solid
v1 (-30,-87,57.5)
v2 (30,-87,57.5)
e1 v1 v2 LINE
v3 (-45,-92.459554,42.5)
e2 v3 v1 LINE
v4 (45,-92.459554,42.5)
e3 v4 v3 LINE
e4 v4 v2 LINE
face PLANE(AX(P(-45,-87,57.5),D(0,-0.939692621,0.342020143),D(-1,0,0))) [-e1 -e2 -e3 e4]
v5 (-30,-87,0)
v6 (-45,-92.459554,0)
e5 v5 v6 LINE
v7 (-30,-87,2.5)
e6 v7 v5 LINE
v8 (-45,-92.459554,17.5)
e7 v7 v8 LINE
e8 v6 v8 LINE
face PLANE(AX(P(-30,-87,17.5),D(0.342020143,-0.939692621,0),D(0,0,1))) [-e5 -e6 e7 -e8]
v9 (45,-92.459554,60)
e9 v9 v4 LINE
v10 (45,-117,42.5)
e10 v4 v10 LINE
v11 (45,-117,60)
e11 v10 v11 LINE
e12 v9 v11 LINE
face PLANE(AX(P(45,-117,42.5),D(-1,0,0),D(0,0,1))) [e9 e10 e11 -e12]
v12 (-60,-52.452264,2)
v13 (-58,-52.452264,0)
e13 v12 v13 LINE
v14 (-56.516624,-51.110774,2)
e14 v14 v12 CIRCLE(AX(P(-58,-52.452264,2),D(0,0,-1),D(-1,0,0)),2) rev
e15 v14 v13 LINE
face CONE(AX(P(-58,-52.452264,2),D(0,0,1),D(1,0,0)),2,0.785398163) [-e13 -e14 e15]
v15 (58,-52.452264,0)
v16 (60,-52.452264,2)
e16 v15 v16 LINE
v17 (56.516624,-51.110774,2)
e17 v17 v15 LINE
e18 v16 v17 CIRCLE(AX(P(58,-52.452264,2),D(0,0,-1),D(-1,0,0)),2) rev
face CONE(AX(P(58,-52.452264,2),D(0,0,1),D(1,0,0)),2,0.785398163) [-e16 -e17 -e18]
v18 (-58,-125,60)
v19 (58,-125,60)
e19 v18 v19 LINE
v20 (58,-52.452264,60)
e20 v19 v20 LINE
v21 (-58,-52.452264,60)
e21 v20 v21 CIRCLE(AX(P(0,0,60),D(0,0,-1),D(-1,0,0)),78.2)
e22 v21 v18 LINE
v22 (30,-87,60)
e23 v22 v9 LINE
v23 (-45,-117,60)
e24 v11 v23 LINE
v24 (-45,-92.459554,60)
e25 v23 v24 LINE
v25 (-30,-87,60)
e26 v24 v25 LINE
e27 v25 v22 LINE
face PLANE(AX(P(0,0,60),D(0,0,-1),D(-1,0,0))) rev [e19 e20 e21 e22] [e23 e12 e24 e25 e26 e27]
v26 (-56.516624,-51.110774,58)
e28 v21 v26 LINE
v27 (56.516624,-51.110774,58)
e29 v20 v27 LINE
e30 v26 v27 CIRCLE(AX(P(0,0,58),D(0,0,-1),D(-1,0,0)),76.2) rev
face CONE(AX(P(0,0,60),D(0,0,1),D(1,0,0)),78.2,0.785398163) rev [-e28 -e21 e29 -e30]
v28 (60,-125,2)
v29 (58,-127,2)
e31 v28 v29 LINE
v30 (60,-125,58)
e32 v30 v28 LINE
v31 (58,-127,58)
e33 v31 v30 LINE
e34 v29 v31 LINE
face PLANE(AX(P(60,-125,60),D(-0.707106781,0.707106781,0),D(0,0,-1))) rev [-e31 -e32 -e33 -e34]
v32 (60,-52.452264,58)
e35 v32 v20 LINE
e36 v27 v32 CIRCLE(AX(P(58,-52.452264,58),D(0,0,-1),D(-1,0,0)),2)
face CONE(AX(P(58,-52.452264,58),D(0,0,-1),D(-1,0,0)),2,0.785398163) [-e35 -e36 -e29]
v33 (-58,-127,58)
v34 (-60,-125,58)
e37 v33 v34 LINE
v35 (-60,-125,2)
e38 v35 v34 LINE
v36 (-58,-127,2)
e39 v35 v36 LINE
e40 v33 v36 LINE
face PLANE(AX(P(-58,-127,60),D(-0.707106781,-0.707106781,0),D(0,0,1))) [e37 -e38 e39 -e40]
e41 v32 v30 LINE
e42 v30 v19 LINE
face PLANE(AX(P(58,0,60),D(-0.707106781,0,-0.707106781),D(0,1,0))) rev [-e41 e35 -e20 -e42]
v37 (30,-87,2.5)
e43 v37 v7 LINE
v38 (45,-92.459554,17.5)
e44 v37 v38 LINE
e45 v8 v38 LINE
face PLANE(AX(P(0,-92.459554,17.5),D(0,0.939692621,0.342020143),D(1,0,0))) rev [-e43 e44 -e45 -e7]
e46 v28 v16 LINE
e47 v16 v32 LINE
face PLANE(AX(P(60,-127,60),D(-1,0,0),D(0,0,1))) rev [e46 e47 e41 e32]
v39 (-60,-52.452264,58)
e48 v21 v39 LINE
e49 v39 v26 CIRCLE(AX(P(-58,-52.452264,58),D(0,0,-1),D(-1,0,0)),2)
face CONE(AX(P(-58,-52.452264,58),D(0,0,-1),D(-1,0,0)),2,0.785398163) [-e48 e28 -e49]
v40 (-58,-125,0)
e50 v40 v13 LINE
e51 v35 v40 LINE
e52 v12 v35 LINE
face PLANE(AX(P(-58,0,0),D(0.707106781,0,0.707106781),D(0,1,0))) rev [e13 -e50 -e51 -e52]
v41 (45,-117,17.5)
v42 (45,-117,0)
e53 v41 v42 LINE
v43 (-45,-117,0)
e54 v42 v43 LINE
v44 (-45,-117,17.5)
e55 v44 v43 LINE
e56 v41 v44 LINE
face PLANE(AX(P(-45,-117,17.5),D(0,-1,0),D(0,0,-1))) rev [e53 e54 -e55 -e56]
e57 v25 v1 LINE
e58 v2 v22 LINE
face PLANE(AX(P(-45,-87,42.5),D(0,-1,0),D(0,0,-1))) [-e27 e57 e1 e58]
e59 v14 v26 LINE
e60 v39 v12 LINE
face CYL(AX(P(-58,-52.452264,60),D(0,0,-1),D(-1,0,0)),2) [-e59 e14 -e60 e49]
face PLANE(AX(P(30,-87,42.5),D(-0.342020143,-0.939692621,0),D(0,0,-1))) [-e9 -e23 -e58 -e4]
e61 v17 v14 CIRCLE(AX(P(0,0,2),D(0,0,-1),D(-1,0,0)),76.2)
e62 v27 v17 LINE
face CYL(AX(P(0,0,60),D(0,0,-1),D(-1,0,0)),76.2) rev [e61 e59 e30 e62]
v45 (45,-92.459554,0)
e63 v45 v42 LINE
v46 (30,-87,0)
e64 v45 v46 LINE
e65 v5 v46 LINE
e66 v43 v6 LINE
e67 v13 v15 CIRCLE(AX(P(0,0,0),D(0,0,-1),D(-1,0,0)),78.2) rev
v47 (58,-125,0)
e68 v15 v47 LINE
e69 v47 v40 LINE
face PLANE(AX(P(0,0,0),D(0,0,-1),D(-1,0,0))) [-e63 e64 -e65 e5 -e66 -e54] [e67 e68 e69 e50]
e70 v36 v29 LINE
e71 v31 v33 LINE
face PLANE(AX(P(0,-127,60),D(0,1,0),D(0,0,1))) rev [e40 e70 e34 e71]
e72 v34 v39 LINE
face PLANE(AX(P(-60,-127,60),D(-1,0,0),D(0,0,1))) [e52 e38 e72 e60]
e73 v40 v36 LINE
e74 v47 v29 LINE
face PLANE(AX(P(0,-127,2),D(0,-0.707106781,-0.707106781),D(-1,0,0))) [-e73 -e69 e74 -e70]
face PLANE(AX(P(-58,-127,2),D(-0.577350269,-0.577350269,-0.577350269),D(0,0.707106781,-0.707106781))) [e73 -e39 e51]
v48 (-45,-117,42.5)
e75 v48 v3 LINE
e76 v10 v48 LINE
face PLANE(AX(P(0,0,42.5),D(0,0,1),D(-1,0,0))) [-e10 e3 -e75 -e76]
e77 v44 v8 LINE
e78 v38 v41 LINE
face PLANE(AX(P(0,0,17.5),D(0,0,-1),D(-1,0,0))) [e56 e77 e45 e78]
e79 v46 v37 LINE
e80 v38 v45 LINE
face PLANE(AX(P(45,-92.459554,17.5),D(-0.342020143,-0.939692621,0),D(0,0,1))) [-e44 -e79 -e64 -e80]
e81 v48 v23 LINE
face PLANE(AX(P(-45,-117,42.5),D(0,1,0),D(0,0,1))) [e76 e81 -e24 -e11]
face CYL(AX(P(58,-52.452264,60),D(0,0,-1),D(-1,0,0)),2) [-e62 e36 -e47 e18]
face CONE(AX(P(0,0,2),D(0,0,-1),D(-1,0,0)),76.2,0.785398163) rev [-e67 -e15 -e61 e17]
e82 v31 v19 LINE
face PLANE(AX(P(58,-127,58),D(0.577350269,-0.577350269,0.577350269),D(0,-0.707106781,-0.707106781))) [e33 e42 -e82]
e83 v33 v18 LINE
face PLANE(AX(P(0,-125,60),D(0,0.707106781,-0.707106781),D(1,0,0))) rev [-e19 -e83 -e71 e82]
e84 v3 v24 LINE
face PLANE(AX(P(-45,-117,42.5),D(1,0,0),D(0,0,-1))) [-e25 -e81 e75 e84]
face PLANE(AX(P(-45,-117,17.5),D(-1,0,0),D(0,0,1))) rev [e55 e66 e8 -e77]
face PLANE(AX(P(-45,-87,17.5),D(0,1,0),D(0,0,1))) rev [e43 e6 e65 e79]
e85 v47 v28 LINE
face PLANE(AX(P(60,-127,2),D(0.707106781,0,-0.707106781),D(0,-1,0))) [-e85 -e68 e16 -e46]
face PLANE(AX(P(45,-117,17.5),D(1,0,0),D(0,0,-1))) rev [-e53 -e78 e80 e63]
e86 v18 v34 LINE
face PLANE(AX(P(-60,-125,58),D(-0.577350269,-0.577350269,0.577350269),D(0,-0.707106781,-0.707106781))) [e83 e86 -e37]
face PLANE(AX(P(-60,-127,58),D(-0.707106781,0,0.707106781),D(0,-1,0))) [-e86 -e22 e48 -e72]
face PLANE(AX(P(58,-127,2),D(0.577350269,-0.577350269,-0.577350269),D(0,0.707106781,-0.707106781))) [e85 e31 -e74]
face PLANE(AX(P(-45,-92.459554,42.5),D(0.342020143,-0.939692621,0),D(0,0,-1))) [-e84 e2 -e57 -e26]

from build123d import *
from OCP.BRepFilletAPI import BRepFilletAPI_MakeChamfer

# Parameters (mm, degrees)
BOSS_EXTRUDE1_DEPTH        = 60
FILLET1_R                  = 2
CHAMFER1_SIZE              = 2
SKETCH2_W                  = 90
SKETCH2_H                  = 30
CUT_EXTRUDE1_DEPTH         = 17.5
CHAMFER2_SIZE              = 15
CHAMFER2_SIZE_2            = 5.459553514
CHAMFER2_OF_MIRROR2_SIZE   = 15
CHAMFER2_OF_MIRROR2_SIZE_2 = 5.459553514


with BuildPart() as part:
    # Sketch1 → Boss-Extrude1 (new body)
    with BuildSketch(Plane.XY):
        with BuildLine():
            Line((0, -76.2), (0, -127))
            Line((0, -127), (60, -127))
            Line((60, -127), (60, -46.972758063))
            ThreePointArc((60, -46.972758063), (33.37001525, -68.504613583), (0, -76.2))
        make_face()
    boss_extrude1 = extrude(amount=BOSS_EXTRUDE1_DEPTH)

    # Mirror1: Boss-Extrude1 across plane
    add(boss_extrude1.mirror(Plane(origin=(0, -76.2, 60), x_dir=(0, 0, 1), z_dir=(1, 0, 0))))

    # Fillet1
    fillet1_edges = [part.edges().sort_by_distance(p)[0] for p in [
        (-60, -46.972758063, 30),
        (60, -46.972758063, 30),
    ]]
    fillet(fillet1_edges, radius=FILLET1_R)

    # Chamfer1
    chamfer1_edges = [part.edges().sort_by_distance(p)[0] for p in [
        (-60, -127, 30),
        (-60, -89.726132006, 60),
        (-60, -89.726132006, 0),
        (0, -76.2, 0),
        (0, -76.2, 60),
        (-58.718765637, -50.585883569, 0),
        (58.718765637, -50.585883569, 0),
        (-58.718765637, -50.585883569, 60),
        (58.718765637, -50.585883569, 60),
        (0, -127, 60),
        (60, -89.726132006, 0),
        (0, -127, 0),
        (60, -127, 30),
        (60, -89.726132006, 60),
    ]]
    chamfer(chamfer1_edges, length=CHAMFER1_SIZE)

    # Sketch2 → Cut-Extrude1 (cut)
    with BuildSketch(Plane(origin=(0, 0, 0), x_dir=(-1, 0, 0), z_dir=(0, 0, -1))):
        with Locations((0, -102)):
            Rectangle(SKETCH2_W, SKETCH2_H)
    cut_extrude1 = extrude(amount=-CUT_EXTRUDE1_DEPTH, mode=Mode.SUBTRACT)

    # Chamfer2
    chamfer2_edges_1 = [part.edges().sort_by_distance(p)[0] for p in [
        (-45, -87, 8.75),
    ]]
    chamfer2_side_1 = [part.faces().sort_by_distance(p)[0] for p in [
        (-44.89080893, -87, 8.75),
    ]]
    chamfer2_edges_2 = [part.edges().sort_by_distance(p)[0] for p in [
        (0, -87, 17.5),
    ]]
    chamfer2_side_2 = [part.faces().sort_by_distance(p)[0] for p in [
        (0, -87, 17.39080893),
    ]]
    chamfer2_edges_3 = [part.edges().sort_by_distance(p)[0] for p in [
        (45, -87, 8.75),
    ]]
    chamfer2_side_3 = [part.faces().sort_by_distance(p)[0] for p in [
        (45, -87.10919107, 8.75),
    ]]
    chamfer2 = BRepFilletAPI_MakeChamfer(part.part.solid().wrapped)
    for e in chamfer2_edges_1:
        chamfer2.Add(CHAMFER2_SIZE - 0.0001, CHAMFER2_SIZE_2 - 0.0001, e.wrapped, chamfer2_side_1[0].wrapped)
    for e in chamfer2_edges_2:
        chamfer2.Add(CHAMFER2_SIZE - 0.0001, CHAMFER2_SIZE_2 - 0.0001, e.wrapped, chamfer2_side_2[0].wrapped)
    for e in chamfer2_edges_3:
        chamfer2.Add(CHAMFER2_SIZE_2 - 0.0001, CHAMFER2_SIZE - 0.0001, e.wrapped, chamfer2_side_3[0].wrapped)
    add(Compound.cast(chamfer2.Shape()), mode=Mode.REPLACE)  # a hair under: the kernel refuses the full size

    # Mirror2: Cut-Extrude1 across plane
    add(cut_extrude1.mirror(Plane(origin=(0, 0, 30), x_dir=(1, 0, 0), z_dir=(0, 0, -1))), mode=Mode.SUBTRACT)

    # Chamfer2 of Mirror2
    chamfer2_of_mirror2_edges_1 = [part.edges().sort_by_distance(p)[0] for p in [
        (-45, -87, 51.25),
    ]]
    chamfer2_of_mirror2_side_1 = [part.faces().sort_by_distance(p)[0] for p in [
        (-44.89080893, -87, 51.25),
    ]]
    chamfer2_of_mirror2_edges_2 = [part.edges().sort_by_distance(p)[0] for p in [
        (0, -87, 42.5),
    ]]
    chamfer2_of_mirror2_side_2 = [part.faces().sort_by_distance(p)[0] for p in [
        (0, -87, 42.60919107),
    ]]
    chamfer2_of_mirror2_edges_3 = [part.edges().sort_by_distance(p)[0] for p in [
        (45, -87, 51.25),
    ]]
    chamfer2_of_mirror2_side_3 = [part.faces().sort_by_distance(p)[0] for p in [
        (45, -87.10919107, 51.25),
    ]]
    chamfer2_of_mirror2 = BRepFilletAPI_MakeChamfer(part.part.solid().wrapped)
    for e in chamfer2_of_mirror2_edges_1:
        chamfer2_of_mirror2.Add(CHAMFER2_OF_MIRROR2_SIZE - 0.0001, CHAMFER2_OF_MIRROR2_SIZE_2 - 0.0001, e.wrapped, chamfer2_of_mirror2_side_1[0].wrapped)
    for e in chamfer2_of_mirror2_edges_2:
        chamfer2_of_mirror2.Add(CHAMFER2_OF_MIRROR2_SIZE - 0.0001, CHAMFER2_OF_MIRROR2_SIZE_2 - 0.0001, e.wrapped, chamfer2_of_mirror2_side_2[0].wrapped)
    for e in chamfer2_of_mirror2_edges_3:
        chamfer2_of_mirror2.Add(CHAMFER2_OF_MIRROR2_SIZE_2 - 0.0001, CHAMFER2_OF_MIRROR2_SIZE - 0.0001, e.wrapped, chamfer2_of_mirror2_side_3[0].wrapped)
    add(Compound.cast(chamfer2_of_mirror2.Shape()), mode=Mode.REPLACE)  # a hair under: the kernel refuses the full size


solid = part.part
